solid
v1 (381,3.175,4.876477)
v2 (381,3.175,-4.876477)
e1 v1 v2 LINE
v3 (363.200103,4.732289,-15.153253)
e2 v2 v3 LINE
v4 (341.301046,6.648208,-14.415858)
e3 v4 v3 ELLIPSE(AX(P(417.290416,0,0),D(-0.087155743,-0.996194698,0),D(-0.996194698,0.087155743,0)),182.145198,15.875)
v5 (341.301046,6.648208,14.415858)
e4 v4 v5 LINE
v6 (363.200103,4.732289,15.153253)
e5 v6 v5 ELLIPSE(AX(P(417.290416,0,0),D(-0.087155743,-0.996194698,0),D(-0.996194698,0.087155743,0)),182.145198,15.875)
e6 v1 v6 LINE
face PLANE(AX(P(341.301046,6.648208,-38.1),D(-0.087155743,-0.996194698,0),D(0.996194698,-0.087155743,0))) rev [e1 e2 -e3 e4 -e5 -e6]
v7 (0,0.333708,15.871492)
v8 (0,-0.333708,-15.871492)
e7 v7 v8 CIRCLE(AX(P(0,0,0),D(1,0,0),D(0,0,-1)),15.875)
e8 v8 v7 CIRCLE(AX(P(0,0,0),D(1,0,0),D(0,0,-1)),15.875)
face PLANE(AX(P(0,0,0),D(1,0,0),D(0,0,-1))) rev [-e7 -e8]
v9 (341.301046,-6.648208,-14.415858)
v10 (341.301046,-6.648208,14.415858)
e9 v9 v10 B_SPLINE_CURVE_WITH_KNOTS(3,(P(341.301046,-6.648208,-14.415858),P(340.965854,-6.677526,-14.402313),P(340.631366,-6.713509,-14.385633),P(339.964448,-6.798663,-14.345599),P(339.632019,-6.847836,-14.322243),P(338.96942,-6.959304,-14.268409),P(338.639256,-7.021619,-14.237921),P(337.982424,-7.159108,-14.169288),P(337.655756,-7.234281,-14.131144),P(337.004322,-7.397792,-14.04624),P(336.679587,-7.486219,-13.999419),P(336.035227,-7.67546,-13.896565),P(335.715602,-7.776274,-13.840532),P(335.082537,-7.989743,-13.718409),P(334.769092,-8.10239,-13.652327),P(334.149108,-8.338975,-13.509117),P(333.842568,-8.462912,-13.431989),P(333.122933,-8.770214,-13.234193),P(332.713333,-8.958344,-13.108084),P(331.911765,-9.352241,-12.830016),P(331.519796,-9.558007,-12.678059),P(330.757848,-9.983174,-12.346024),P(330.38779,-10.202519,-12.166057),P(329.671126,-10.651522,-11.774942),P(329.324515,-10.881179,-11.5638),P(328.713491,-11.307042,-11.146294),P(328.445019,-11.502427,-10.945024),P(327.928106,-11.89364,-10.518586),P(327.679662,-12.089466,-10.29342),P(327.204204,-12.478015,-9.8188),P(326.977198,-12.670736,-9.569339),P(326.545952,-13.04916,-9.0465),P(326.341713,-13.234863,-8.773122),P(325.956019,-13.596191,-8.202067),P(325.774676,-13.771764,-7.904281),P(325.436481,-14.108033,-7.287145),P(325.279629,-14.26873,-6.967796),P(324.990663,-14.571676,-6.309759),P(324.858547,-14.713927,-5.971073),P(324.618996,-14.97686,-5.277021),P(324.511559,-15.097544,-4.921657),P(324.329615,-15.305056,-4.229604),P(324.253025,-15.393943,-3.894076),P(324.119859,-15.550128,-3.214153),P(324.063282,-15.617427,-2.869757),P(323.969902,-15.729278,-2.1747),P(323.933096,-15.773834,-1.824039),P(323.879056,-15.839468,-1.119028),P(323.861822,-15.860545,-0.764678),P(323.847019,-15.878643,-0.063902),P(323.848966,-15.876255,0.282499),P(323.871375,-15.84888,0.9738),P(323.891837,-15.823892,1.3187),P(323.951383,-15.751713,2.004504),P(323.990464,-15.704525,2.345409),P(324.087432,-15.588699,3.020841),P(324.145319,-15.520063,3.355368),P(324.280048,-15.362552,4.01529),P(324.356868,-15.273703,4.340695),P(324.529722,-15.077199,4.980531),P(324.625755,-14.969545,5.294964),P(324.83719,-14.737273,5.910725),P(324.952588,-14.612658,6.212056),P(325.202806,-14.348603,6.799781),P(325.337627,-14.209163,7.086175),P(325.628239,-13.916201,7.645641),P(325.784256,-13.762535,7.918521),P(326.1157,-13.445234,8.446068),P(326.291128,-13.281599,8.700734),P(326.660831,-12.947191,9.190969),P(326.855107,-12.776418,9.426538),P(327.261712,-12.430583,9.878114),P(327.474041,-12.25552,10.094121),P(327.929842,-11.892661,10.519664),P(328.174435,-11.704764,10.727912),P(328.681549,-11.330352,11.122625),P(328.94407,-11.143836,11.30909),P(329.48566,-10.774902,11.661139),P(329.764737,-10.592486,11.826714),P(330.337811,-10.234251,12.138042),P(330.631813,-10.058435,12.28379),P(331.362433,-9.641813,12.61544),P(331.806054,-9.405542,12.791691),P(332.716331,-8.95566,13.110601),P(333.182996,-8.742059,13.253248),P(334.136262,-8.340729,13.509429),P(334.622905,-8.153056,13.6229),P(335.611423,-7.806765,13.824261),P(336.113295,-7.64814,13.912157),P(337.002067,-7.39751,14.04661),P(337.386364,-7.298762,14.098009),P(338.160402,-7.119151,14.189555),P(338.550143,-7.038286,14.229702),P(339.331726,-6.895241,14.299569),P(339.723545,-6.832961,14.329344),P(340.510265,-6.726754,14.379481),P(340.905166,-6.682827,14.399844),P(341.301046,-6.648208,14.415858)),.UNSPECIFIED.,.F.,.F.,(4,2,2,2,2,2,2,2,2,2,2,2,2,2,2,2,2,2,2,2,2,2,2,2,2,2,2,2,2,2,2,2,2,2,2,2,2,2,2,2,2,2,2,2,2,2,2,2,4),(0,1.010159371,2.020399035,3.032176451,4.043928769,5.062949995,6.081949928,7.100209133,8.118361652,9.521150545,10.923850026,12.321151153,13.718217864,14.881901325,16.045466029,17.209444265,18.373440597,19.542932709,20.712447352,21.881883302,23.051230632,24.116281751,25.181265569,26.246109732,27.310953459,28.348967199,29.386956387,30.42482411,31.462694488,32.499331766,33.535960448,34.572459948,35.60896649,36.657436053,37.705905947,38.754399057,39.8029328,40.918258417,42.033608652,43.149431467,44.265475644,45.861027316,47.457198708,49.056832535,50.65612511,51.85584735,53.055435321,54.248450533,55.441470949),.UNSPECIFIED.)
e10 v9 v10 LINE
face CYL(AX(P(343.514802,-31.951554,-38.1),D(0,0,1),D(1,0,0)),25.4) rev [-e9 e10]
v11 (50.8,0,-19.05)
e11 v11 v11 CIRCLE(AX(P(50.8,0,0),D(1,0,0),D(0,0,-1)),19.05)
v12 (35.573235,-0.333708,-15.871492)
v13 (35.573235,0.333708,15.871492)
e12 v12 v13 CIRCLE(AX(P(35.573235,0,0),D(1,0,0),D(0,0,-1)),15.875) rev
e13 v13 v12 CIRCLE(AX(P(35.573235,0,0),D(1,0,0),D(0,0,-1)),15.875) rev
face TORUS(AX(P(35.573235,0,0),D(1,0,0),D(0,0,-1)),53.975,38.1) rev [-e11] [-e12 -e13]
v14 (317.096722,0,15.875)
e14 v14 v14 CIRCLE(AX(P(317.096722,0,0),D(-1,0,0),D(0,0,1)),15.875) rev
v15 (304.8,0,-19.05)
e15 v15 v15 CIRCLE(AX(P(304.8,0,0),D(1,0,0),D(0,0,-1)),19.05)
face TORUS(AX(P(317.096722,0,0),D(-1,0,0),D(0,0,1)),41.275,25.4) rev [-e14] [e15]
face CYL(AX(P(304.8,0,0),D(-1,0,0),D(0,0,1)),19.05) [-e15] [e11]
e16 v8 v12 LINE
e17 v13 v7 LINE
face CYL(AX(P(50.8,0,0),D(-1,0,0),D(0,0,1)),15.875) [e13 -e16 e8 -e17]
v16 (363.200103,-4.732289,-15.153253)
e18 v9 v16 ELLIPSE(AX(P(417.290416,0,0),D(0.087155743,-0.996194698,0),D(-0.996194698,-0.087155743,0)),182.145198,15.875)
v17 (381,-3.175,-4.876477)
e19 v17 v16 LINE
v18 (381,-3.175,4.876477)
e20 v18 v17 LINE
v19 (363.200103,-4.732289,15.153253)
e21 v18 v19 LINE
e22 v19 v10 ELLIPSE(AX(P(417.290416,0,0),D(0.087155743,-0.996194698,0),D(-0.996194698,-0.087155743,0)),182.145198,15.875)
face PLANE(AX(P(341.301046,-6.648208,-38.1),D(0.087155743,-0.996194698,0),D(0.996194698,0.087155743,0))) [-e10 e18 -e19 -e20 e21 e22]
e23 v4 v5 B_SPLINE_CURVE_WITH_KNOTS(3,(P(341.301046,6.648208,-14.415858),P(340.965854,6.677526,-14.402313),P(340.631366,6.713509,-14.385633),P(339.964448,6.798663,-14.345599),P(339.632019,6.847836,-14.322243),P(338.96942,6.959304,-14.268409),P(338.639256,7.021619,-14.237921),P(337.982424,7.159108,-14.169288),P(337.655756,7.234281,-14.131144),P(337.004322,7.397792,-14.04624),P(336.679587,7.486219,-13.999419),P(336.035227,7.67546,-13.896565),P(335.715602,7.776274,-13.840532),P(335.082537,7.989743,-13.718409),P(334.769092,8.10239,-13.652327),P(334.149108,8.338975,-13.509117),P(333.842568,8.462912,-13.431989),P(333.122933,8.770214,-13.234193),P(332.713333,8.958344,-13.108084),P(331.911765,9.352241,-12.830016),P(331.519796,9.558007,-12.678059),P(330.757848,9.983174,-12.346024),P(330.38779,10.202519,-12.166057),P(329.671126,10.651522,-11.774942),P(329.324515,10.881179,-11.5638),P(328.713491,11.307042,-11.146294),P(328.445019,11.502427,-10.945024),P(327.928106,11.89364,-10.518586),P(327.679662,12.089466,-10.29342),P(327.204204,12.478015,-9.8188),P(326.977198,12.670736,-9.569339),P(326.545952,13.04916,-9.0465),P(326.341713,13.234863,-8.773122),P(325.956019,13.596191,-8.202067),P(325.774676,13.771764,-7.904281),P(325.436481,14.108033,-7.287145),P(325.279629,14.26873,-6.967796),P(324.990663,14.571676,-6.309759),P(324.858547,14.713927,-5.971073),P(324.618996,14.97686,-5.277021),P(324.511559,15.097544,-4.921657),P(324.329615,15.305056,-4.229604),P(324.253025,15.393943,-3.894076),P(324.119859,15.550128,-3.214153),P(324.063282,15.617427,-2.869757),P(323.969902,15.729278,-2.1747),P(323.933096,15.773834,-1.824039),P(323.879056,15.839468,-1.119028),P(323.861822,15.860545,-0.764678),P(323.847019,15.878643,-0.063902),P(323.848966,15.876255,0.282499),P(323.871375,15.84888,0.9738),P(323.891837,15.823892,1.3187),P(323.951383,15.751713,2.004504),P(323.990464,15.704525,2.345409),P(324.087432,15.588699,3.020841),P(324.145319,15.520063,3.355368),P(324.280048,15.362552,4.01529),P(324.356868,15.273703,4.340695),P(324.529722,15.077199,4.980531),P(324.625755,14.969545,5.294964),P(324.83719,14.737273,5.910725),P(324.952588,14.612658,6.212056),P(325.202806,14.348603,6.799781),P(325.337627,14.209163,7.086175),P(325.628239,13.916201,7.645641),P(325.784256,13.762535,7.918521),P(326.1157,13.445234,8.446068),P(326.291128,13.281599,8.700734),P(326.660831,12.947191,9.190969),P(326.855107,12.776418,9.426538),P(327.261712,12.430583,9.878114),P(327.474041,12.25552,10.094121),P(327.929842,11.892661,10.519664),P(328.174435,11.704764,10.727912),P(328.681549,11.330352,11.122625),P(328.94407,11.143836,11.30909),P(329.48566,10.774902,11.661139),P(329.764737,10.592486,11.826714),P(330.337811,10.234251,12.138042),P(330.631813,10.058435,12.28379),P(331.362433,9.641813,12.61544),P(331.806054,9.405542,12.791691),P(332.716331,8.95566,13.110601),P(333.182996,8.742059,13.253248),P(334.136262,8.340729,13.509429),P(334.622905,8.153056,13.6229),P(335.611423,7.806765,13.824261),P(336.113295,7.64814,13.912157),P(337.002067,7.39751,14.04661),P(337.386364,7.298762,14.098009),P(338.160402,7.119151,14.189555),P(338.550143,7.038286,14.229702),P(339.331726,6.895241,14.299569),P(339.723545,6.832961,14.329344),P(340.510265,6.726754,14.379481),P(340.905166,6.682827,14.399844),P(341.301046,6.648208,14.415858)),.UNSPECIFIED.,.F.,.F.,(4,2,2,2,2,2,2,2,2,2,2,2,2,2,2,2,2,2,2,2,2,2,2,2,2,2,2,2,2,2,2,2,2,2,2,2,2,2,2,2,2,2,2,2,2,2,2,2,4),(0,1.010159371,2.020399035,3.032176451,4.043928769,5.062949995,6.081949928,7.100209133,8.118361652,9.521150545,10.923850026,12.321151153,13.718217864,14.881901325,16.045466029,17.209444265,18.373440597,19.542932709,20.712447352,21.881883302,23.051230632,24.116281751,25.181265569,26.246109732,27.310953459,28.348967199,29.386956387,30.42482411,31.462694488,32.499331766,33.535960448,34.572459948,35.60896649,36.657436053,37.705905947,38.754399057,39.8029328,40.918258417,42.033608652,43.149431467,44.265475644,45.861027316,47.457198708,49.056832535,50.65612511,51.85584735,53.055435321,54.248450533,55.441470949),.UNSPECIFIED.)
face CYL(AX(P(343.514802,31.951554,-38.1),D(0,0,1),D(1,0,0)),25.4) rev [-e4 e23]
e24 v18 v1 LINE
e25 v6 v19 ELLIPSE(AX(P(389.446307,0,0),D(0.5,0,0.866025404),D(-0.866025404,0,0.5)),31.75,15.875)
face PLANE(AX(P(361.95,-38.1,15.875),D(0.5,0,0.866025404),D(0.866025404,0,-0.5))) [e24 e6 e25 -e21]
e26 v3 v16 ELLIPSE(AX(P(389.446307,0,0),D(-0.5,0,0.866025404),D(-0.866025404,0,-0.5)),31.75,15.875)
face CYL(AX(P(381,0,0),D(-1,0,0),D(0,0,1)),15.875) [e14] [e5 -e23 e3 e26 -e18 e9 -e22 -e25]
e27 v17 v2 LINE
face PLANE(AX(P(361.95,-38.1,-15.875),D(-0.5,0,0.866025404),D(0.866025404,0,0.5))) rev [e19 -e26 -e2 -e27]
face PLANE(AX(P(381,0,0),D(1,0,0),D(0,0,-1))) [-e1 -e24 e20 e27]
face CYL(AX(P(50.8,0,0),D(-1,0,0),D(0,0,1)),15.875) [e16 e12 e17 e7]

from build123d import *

# Parameters (mm, degrees)
SKETCH1_R           = 15.875
BASE_EXTRUDE_DEPTH  = 50.8
SKETCH2_R           = 19.05
BOSS_EXTRUDE1_DEPTH = 254
SKETCH3_R           = 15.875
BOSS_EXTRUDE2_DEPTH = 76.2
FILLET1_R           = 25.4
FILLET2_R           = 38.1
CUT_EXTRUDE1_DEPTH  = 38.1
CUT_EXTRUDE2_DEPTH  = 38.1


with BuildPart() as part:
    # Sketch1 → Base-Extrude (new body)
    with BuildSketch(Plane(origin=(0, 0, 0), x_dir=(0, 0, -1), z_dir=(1, 0, 0))):
        Circle(SKETCH1_R)
    extrude(amount=BASE_EXTRUDE_DEPTH)

    # Sketch2 → Boss-Extrude1 (add)
    with BuildSketch(Plane(origin=(50.8, 0, 0), x_dir=(0, 0, -1), z_dir=(1, 0, 0))):
        Circle(SKETCH2_R)
    extrude(amount=BOSS_EXTRUDE1_DEPTH)

    # Sketch3 → Boss-Extrude2 (add)
    with BuildSketch(Plane(origin=(304.8, 0, 0), x_dir=(0, 0, -1), z_dir=(1, 0, 0))):
        Circle(SKETCH3_R)
    extrude(amount=BOSS_EXTRUDE2_DEPTH)

    # Fillet1
    # the kernel refuses this fillet: 25.4 mm, written as the material it adds along each edge
    with BuildSketch(Plane(origin=(304.8, 0, 0), x_dir=(0, 0, -1), z_dir=(0, -1, 0))) as fillet1_piece_1:
        with BuildLine():
            CenterArc((41.275, 12.296722124), FILLET1_R, 180, 28.955024372)
            Line((15.875, 12.296722124), (15.367, 12.296722124))
            Line((15.367, 12.296722124), (15.367, 0))
            Line((15.367, 0), (15.875, -0.508))
            ThreePointArc((15.875, -0.508), (17.4625, -0.508), (18.6055, -0.245934442))
            Line((18.6055, -0.245934442), (19.05, 0))
        make_face()
    revolve(axis=Axis((304.8, 0, 0), (1, 0, 0)))

    # Fillet2
    # the kernel refuses this fillet: 38.1 mm, written as the material it adds along each edge
    with BuildSketch(Plane(origin=(50.8, 0, 0), x_dir=(0, 0, -1), z_dir=(0, -1, 0))) as fillet2_piece_1:
        with BuildLine():
            CenterArc((53.975, -15.226765087), FILLET2_R, 156.443535691, 23.556464309)
            Line((15.875, -15.226765087), (15.113, -15.226765087))
            Line((15.113, -15.226765087), (15.113, 0))
            Line((15.113, 0), (15.875, 0.762))
            ThreePointArc((15.875, 0.762), (17.4625, 0.762), (18.3515, 0.304535302))
            Line((18.3515, 0.304535302), (19.05, 0))
        make_face()
    revolve(axis=Axis((50.8, 0, 0), (1, 0, 0)))

    # Sketch4 → Cut-Extrude1 (cut, symmetric)
    with BuildSketch(Plane.XY):
        with BuildLine():
            Line((341.301045638, 6.648208461), (381, 3.175))
            Line((381, 3.175), (381, 15.875))
            Line((381, 15.875), (323.85, 15.875))
            ThreePointArc((323.85, 15.875), (331.642512816, 9.496960468), (341.301045638, 6.648208461))
        make_face()
    cut_extrude1 = extrude(amount=CUT_EXTRUDE1_DEPTH, both=True, mode=Mode.SUBTRACT)

    # Mirror1: Cut-Extrude1 across plane
    add(cut_extrude1.mirror(Plane.ZX), mode=Mode.SUBTRACT)

    # Sketch5 → Cut-Extrude2 (cut, symmetric)
    with BuildSketch(Plane(origin=(0, 0, 0), x_dir=(1, 0, 0), z_dir=(0, 1, 0))):
        Polygon((361.95, 15.875), (381, 4.876477372), (381, 15.875), align=None)
    cut_extrude2 = extrude(amount=CUT_EXTRUDE2_DEPTH, both=True, mode=Mode.SUBTRACT)

    # Mirror2: Cut-Extrude2 across plane
    add(cut_extrude2.mirror(Plane.XY), mode=Mode.SUBTRACT)


solid = part.part
